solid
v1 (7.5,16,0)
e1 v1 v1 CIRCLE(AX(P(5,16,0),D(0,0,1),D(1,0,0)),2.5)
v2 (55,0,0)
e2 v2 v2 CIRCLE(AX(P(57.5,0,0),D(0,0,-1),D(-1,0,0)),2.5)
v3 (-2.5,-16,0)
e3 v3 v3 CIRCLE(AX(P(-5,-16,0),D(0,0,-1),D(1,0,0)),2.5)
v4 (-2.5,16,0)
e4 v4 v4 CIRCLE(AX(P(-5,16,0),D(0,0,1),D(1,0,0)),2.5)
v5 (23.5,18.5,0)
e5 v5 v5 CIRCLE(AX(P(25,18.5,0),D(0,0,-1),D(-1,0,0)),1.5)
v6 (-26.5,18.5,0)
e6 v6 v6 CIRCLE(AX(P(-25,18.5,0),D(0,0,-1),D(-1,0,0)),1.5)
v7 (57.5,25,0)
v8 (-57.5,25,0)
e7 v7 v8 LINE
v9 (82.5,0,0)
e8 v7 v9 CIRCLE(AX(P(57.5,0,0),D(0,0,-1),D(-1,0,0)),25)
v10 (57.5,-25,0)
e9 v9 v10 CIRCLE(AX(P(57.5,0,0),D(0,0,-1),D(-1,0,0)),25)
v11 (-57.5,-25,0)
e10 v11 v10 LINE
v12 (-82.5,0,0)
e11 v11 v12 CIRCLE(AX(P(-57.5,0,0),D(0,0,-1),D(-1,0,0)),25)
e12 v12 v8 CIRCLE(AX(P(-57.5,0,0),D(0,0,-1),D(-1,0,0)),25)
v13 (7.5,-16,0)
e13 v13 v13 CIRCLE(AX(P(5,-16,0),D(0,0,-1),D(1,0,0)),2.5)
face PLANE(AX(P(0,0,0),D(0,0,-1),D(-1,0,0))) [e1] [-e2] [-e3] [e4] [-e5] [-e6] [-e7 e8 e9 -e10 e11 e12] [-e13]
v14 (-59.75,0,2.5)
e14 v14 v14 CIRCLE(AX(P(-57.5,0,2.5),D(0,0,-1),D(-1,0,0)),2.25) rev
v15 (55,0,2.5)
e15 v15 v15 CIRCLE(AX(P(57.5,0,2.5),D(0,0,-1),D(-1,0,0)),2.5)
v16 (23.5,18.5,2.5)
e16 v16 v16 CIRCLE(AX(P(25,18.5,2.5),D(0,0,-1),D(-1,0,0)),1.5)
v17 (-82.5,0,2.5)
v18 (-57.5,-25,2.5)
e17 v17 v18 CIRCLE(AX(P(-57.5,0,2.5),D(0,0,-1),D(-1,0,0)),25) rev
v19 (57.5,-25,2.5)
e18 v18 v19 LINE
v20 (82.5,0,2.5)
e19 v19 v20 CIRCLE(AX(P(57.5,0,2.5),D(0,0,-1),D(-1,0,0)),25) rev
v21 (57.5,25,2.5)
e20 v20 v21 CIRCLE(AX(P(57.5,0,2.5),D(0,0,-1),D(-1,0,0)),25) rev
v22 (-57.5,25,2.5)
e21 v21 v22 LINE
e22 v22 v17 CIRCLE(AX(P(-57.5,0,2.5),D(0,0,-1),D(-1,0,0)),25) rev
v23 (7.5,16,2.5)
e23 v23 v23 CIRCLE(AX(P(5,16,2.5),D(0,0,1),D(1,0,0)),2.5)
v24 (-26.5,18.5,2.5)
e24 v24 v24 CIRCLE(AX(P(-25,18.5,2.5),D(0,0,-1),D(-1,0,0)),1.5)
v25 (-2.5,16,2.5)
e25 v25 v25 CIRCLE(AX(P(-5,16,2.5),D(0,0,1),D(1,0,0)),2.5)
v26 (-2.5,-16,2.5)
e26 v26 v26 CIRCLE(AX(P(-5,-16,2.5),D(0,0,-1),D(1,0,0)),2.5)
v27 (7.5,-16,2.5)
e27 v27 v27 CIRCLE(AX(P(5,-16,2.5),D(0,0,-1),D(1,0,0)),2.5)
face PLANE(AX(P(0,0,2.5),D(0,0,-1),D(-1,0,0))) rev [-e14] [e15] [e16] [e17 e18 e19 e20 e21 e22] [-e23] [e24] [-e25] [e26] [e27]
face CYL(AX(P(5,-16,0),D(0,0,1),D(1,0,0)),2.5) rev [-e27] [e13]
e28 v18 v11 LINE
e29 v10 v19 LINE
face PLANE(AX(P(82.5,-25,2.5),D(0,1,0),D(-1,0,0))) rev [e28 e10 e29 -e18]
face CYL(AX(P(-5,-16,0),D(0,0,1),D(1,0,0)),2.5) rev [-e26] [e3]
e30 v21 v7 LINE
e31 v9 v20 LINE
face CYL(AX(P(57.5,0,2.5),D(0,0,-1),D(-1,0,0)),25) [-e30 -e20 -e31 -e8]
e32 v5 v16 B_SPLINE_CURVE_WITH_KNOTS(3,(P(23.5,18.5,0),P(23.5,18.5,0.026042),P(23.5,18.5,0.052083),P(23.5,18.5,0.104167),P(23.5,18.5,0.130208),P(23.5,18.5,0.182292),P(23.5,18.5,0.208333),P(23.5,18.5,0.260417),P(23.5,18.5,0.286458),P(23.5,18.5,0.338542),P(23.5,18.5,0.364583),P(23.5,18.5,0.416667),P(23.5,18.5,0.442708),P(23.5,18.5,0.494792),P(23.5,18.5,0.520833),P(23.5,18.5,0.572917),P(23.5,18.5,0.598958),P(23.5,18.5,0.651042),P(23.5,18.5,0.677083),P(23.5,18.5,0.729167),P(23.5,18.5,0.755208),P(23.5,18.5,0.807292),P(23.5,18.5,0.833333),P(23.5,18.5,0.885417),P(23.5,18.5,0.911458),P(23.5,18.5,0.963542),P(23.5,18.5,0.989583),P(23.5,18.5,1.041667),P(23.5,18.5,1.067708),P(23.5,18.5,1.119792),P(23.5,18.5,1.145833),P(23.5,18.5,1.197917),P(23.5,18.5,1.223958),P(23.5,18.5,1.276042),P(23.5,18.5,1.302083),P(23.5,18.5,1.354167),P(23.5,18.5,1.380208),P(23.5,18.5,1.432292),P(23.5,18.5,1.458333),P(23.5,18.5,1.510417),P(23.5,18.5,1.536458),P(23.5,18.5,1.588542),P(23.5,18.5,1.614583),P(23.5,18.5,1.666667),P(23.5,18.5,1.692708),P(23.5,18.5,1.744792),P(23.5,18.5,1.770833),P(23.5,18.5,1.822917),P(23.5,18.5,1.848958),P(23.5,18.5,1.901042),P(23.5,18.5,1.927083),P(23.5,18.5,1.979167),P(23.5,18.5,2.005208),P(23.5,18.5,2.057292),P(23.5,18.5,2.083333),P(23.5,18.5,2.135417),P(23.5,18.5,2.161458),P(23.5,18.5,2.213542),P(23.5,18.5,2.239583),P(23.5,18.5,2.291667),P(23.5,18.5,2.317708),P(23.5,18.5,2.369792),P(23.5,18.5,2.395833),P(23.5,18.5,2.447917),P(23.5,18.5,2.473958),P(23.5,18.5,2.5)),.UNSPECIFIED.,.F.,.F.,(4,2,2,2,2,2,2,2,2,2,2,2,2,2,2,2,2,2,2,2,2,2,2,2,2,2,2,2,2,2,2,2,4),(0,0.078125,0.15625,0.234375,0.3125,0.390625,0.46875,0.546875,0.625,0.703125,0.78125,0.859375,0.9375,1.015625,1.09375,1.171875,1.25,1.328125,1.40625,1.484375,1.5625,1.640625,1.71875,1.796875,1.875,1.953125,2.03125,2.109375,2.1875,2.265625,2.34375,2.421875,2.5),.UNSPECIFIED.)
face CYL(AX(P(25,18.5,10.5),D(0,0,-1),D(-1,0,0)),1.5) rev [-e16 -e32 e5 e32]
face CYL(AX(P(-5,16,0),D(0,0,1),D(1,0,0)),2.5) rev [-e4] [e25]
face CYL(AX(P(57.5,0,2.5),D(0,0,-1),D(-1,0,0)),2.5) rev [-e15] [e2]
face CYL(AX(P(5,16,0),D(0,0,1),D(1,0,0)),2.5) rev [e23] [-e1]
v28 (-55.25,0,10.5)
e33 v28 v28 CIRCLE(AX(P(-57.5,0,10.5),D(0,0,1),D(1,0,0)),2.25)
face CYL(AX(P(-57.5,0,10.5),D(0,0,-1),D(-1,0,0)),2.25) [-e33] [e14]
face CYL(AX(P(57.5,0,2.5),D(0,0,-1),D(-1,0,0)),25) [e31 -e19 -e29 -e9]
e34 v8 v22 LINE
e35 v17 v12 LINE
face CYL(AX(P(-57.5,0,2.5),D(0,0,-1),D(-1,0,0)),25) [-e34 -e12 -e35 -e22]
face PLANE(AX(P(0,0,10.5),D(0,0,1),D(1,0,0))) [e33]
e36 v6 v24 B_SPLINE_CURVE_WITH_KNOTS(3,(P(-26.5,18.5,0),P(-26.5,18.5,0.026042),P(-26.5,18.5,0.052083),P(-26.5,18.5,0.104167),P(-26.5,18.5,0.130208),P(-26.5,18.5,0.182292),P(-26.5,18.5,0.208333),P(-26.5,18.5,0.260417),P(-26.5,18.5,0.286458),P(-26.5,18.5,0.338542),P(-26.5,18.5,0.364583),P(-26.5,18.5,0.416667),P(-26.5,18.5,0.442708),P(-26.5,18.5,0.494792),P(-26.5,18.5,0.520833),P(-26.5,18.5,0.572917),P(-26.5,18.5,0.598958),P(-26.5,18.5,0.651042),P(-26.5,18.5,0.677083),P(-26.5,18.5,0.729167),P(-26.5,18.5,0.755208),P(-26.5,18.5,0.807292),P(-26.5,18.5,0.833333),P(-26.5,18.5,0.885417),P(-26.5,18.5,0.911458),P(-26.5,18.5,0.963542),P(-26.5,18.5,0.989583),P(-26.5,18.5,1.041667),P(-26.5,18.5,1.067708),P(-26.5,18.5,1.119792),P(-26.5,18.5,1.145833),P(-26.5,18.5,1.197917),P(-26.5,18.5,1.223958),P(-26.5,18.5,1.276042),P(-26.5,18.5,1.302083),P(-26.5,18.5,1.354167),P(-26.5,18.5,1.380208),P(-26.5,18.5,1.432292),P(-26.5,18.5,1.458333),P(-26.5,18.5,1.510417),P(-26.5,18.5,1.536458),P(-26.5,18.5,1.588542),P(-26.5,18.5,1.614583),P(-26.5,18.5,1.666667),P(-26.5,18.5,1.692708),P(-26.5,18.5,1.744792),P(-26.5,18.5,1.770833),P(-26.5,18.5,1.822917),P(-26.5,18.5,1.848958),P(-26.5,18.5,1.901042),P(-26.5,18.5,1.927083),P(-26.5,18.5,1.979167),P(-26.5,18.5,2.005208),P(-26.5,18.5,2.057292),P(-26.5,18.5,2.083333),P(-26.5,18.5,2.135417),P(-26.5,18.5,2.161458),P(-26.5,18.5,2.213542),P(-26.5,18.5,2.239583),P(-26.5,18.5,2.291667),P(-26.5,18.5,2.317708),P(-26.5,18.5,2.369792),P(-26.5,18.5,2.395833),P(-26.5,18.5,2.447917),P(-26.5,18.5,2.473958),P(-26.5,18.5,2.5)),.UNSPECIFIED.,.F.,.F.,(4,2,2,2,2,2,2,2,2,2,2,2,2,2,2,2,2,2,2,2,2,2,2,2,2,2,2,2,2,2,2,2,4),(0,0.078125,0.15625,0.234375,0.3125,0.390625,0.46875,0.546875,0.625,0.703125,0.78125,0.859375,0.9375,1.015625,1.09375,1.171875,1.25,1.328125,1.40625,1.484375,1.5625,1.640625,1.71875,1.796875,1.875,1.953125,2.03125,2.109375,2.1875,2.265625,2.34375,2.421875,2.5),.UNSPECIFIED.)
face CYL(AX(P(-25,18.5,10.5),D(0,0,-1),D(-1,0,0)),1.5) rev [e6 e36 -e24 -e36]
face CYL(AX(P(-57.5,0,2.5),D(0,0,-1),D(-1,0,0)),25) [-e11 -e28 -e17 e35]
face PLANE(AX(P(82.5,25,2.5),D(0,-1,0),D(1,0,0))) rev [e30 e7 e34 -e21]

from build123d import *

# Parameters (mm, degrees)
SKETCH1_W           = 165
SKETCH1_H           = 50
BOSS_EXTRUDE1_DEPTH = 2.5
FILLET1_R           = 25
SKETCH2_R           = 2.5
CUT_EXTRUDE1_DEPTH  = 2.5
SKETCH3_R           = 2.5
CUT_EXTRUDE2_DEPTH  = 2.5
SKETCH4_R           = 2.25
BOSS_EXTRUDE2_DEPTH = 8
SKETCH6_R           = 1.5
CUT_EXTRUDE4_DEPTH  = 87.841810207


with BuildPart() as part:
    # Sketch1 → Boss-Extrude1 (new body)
    with BuildSketch(Plane.XY):
        Rectangle(SKETCH1_W, SKETCH1_H)
    extrude(amount=BOSS_EXTRUDE1_DEPTH)

    # Fillet1
    fillet1_edges = [part.edges().sort_by_distance(p)[0] for p in [
        (-82.5, -25, 1.25),
        (-82.5, 25, 1.25),
        (82.5, -25, 1.25),
        (82.5, 25, 1.25),
    ]]
    fillet(fillet1_edges, radius=FILLET1_R - 0.0001)  # a hair under: the kernel refuses the full size

    # Sketch2 → Cut-Extrude1 (cut)
    with BuildSketch(Plane.XY.offset(2.5)):
        with Locations((-5, 16)):
            Circle(SKETCH2_R)
        with Locations((5, 16)):
            Circle(SKETCH2_R)
    cut_extrude1 = extrude(amount=-CUT_EXTRUDE1_DEPTH, mode=Mode.SUBTRACT)

    # Mirror1: Cut-Extrude1 across plane
    add(cut_extrude1.mirror(Plane.ZX), mode=Mode.SUBTRACT)

    # Sketch3 → Cut-Extrude2 (cut)
    with BuildSketch(Plane(origin=(0, 0, 0), x_dir=(-1, 0, 0), z_dir=(0, 0, -1))):
        with Locations((-57.5, 0)):
            Circle(SKETCH3_R)
    extrude(amount=-CUT_EXTRUDE2_DEPTH, mode=Mode.SUBTRACT)

    # Sketch4 → Boss-Extrude2 (add)
    with BuildSketch(Plane.XY.offset(2.5)):
        with Locations(Location((-57.5, 0, 0), (0, 0, 180))):
            Circle(SKETCH4_R)
    extrude(amount=BOSS_EXTRUDE2_DEPTH)

    # Sketch6 → Cut-Extrude4 (cut, through all)
    with BuildSketch(Plane(origin=(0, 0, 0), x_dir=(-1, 0, 0), z_dir=(0, 0, -1))):
        with Locations((-25, 18.5)):
            Circle(SKETCH6_R)
        with Locations((25, 18.5)):
            Circle(SKETCH6_R)
    extrude(amount=-CUT_EXTRUDE4_DEPTH, mode=Mode.SUBTRACT)


solid = part.part
